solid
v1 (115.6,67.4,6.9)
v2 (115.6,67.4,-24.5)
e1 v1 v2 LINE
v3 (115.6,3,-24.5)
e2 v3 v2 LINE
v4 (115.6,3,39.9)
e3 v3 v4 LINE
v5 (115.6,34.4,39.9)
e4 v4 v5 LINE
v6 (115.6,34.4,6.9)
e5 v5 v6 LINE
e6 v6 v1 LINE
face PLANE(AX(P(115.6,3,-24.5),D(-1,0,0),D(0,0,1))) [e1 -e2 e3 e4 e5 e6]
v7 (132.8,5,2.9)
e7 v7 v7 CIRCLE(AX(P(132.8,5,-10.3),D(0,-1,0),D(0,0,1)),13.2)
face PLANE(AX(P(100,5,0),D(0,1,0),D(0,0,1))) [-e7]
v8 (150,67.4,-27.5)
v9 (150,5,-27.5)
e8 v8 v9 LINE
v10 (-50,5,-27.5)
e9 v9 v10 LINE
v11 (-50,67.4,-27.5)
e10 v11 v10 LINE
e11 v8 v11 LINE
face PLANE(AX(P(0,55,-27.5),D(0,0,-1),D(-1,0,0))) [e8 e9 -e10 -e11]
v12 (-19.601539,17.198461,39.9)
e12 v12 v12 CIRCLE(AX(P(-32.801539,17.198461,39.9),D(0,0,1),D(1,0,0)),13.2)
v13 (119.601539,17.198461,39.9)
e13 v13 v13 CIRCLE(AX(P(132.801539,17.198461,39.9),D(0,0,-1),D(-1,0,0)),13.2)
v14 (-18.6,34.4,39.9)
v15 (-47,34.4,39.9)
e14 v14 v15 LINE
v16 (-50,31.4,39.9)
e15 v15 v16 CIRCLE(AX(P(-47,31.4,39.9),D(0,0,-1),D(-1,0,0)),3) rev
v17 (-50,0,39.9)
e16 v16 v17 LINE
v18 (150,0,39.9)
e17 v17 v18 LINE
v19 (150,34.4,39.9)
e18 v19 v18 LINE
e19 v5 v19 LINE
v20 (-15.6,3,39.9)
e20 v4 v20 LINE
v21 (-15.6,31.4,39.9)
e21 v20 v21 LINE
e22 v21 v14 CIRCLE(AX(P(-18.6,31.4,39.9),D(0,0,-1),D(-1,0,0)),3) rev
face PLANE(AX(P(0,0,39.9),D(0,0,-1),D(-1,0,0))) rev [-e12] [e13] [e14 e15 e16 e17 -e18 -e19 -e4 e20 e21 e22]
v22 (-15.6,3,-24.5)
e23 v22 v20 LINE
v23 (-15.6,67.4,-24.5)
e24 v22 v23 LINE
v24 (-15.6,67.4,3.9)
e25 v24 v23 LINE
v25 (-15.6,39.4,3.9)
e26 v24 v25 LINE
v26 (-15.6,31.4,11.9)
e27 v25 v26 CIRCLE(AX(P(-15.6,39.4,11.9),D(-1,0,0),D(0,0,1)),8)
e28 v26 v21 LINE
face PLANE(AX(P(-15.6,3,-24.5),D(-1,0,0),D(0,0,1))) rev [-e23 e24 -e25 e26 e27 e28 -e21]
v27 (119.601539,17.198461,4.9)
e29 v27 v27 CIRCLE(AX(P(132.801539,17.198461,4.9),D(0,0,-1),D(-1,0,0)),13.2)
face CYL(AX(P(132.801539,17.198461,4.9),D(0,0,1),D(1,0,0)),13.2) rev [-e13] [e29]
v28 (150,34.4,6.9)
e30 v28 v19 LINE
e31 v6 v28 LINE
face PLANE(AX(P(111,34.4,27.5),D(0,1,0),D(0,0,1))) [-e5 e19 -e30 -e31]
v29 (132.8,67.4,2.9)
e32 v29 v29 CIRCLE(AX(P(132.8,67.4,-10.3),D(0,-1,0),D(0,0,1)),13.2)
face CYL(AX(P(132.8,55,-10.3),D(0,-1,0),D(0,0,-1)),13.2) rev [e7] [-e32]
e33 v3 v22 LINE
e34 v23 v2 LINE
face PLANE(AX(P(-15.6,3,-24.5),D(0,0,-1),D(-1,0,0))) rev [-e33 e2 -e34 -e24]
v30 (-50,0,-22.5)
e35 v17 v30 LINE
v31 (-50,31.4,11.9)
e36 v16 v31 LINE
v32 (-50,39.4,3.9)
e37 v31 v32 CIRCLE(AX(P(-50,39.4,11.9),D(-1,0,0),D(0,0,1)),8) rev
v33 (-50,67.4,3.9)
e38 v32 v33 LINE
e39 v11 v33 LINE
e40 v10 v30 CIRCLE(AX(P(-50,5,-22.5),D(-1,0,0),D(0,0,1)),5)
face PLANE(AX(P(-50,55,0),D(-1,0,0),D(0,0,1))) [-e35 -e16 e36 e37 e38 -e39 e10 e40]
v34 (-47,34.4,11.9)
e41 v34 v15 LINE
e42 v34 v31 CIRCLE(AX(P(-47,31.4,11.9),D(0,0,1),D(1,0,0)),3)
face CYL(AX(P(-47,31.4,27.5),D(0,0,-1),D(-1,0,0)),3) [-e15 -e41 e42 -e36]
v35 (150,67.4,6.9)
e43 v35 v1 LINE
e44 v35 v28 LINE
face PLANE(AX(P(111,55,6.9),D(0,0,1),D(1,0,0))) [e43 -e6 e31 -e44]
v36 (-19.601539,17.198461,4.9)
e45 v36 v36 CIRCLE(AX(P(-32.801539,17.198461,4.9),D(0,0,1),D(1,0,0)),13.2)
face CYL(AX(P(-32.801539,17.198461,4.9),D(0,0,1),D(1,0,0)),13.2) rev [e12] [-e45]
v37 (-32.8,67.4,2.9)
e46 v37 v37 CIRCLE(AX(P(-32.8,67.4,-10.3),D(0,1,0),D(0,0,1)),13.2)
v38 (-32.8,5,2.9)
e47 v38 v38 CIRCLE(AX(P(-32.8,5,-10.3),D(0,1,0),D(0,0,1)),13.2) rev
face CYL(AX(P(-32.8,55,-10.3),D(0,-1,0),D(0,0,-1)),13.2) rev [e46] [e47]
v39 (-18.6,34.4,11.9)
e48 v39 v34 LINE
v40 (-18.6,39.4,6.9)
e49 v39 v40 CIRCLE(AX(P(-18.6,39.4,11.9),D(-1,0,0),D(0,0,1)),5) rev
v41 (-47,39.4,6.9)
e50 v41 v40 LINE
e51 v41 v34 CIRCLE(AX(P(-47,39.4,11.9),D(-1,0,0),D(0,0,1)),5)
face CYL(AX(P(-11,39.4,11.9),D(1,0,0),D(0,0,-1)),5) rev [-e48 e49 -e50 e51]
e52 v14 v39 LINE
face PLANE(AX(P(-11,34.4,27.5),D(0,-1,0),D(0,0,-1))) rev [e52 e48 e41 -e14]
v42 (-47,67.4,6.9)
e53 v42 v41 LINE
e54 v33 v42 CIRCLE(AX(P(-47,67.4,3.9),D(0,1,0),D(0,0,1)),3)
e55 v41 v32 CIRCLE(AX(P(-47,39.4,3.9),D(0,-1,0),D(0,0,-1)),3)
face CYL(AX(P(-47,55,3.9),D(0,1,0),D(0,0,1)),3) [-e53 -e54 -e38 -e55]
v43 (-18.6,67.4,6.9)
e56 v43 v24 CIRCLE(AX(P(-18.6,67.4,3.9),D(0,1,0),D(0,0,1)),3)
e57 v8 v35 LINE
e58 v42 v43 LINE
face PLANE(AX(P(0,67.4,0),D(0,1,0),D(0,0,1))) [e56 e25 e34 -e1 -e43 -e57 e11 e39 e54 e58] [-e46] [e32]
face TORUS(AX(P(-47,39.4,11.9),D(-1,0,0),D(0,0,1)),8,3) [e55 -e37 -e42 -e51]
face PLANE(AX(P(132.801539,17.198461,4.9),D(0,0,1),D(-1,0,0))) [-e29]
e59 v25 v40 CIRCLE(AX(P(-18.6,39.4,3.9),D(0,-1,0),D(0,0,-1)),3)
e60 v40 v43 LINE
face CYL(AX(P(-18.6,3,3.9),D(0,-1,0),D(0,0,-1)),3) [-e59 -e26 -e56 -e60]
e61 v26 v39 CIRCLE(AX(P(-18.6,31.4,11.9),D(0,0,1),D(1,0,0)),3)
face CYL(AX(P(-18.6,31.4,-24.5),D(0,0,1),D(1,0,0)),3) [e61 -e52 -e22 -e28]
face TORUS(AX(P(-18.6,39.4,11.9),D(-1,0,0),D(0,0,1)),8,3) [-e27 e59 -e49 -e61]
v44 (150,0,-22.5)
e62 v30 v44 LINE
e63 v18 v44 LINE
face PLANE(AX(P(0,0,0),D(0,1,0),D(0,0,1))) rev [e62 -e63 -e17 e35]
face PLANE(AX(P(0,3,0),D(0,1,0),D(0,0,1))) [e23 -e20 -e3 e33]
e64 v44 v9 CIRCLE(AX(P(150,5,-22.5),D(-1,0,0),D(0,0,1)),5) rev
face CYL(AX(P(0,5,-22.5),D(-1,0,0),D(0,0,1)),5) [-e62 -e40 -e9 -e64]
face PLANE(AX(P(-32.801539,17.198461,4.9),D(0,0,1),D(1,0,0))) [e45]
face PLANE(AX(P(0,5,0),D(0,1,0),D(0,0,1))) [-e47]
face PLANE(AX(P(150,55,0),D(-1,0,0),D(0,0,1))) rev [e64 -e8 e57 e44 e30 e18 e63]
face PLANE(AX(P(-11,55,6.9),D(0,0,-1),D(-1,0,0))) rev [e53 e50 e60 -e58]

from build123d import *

# Parameters (mm, degrees)
SKETCH1_R           = 13.2
BOSS_EXTRUDE3_DEPTH = 5
SKETCH1_6_W         = 100
SKETCH1_6_H         = 55
SKETCH1_6_R         = 13.2
BOSS_EXTRUDE4_DEPTH = 55
SKETCH2_W           = 65.6
SKETCH2_H           = 52
CUT_EXTRUDE1_DEPTH  = 52
SKETCH3_R           = 13.2
CUT_EXTRUDE2_DEPTH  = 22.6
SKETCH4_W           = 20.6
SKETCH4_H           = 20.6
CUT_EXTRUDE4_DEPTH  = 39
SKETCH9_R           = 13.2
BOSS_EXTRUDE5_DEPTH = 12.4
BOSS_EXTRUDE7_START = 12.4
SKETCH10_R          = 13.2
BOSS_EXTRUDE7_DEPTH = 12.4
MIRROR1_START       = 30.398461356
MIRROR1_OUTLINE_R   = 13.2
MIRROR1_DEPTH       = 37.001538644
MIRROR1_2_OUTLINE_W = 100
MIRROR1_2_OUTLINE_H = 67.4
MIRROR1_2_OUTLINE_R = 13.2
MIRROR1_2_DEPTH     = 3
MIRROR1_3_OUTLINE_W = 34.4
MIRROR1_3_OUTLINE_H = 33
MIRROR1_3_DEPTH     = 4.001538644
MIRROR1_START_2     = 3
MIRROR1_4_OUTLINE_R = 13.2
MIRROR1_4_DEPTH     = 0.998461256
MIRROR1_START_3     = 3.998461256
MIRROR1_5_OUTLINE_R = 13.2
MIRROR1_5_DEPTH     = 26.4000001
MIRROR1_START_4     = 4.9
MIRROR1_6_OUTLINE_R = 13.2
MIRROR1_6_DEPTH     = 35
FILLET3_R           = 5
FILLET4_R           = 5
FILLET5_R           = 3
FILLET6_R           = 3


with BuildPart() as part:
    # Sketch1 → Boss-Extrude3 (new body)
    with BuildSketch(Plane(origin=(0, 0, 0), x_dir=(1, 0, 0), z_dir=(0, 1, 0))):
        with Locations(Location((-32.8, 10.3, 0), (0, 0, 270))):
            Circle(SKETCH1_R)
    boss_extrude3 = extrude(amount=BOSS_EXTRUDE3_DEPTH)

    # Sketch1<6> → Boss-Extrude4 (add)
    with BuildSketch(Plane(origin=(0, 0, 0), x_dir=(1, 0, 0), z_dir=(0, 1, 0))):
        Rectangle(SKETCH1_6_W, SKETCH1_6_H)
        with Locations(Location((-32.8, 10.3, 0), (0, 0, 270))):
            Circle(SKETCH1_6_R, mode=Mode.SUBTRACT)
    extrude(amount=BOSS_EXTRUDE4_DEPTH)

    # Sketch2 → Cut-Extrude1 (cut)
    with BuildSketch(Plane(origin=(0, 55, 0), x_dir=(1, 0, 0), z_dir=(0, 1, 0))):
        with Locations((17.2, -1.5)):
            Rectangle(SKETCH2_W, SKETCH2_H)
    extrude(amount=-CUT_EXTRUDE1_DEPTH, mode=Mode.SUBTRACT)

    # Sketch3 → Cut-Extrude2 (cut)
    with BuildSketch(Plane.XY.offset(27.5)):
        with Locations((-32.801538644, 17.198461356)):
            Circle(SKETCH3_R)
    extrude(amount=-CUT_EXTRUDE2_DEPTH, mode=Mode.SUBTRACT)

    # Sketch4 → Cut-Extrude4 (cut)
    with BuildSketch(Plane.ZY.offset(50)):
        with Locations((17.2, 44.7)):
            Rectangle(SKETCH4_W, SKETCH4_H)
    extrude(amount=-CUT_EXTRUDE4_DEPTH, mode=Mode.SUBTRACT)

    # Sketch9 → Boss-Extrude5 (add)
    with BuildSketch(Plane(origin=(0, 55, 0), x_dir=(1, 0, 0), z_dir=(0, 1, 0))):
        Polygon((-50, -6.9), (-15.6, -6.9), (-15.6, 24.5), (50, 24.5), (50, 27.5), (-50, 27.5), align=None)
        with Locations(Location((-32.8, 10.3, 0), (0, 0, 270))):
            Circle(SKETCH9_R, mode=Mode.SUBTRACT)
    extrude(amount=BOSS_EXTRUDE5_DEPTH)

    # Sketch10 → Boss-Extrude7 (add)
    with BuildSketch(Plane.XY.offset(27.5).offset(BOSS_EXTRUDE7_START)):
        Polygon((-15.6, 3), (-15.6, 34.4), (-50, 34.4), (-50, 0), (50, 0), (50, 3), align=None)
        with Locations((-32.801538644, 17.198461356)):
            Circle(SKETCH10_R, mode=Mode.SUBTRACT)
    extrude(amount=-BOSS_EXTRUDE7_DEPTH)

    # Mirror1: read off the stored shape, not the designer's step
    # Mirror1 outline → Mirror1 (add)
    with BuildSketch(Plane(origin=(0, 0, 0), x_dir=(1, 0, 0), z_dir=(0, 1, 0)).offset(MIRROR1_START)):
        Polygon((150, -6.9), (150, 27.5), (50, 27.5), (50, 24.5), (115.6, 24.5), (115.6, -6.9), align=None)
        with Locations((132.8, 10.3)):
            Circle(MIRROR1_OUTLINE_R, mode=Mode.SUBTRACT)
    extrude(amount=MIRROR1_DEPTH)

    # Mirror1 2 outline → Mirror1 2 (add)
    with BuildSketch(Plane(origin=(0, 0, 0), x_dir=(1, 0, 0), z_dir=(0, 1, 0))):
        with Locations((100, -6.2)):
            Rectangle(MIRROR1_2_OUTLINE_W, MIRROR1_2_OUTLINE_H)
        with Locations((132.8, 10.3)):
            Circle(MIRROR1_2_OUTLINE_R, mode=Mode.SUBTRACT)
    extrude(amount=MIRROR1_2_DEPTH)

    # Mirror1 3 outline → Mirror1 3 (add)
    with BuildSketch(Plane(origin=(0, 0, 0), x_dir=(1, 0, 0), z_dir=(0, 1, 0)).offset(MIRROR1_START)):
        with Locations((132.8, -23.4)):
            Rectangle(MIRROR1_3_OUTLINE_W, MIRROR1_3_OUTLINE_H)
    extrude(amount=MIRROR1_3_DEPTH)

    # Mirror1 4 outline → Mirror1 4 (add)
    with BuildSketch(Plane(origin=(0, 0, 0), x_dir=(1, 0, 0), z_dir=(0, 1, 0)).offset(MIRROR1_START_2)):
        Polygon((150, 27.5), (50, 27.5), (50, 24.5), (115.6, 24.5), (115.6, -39.9), (150, -39.9), align=None)
        with Locations((132.8, 10.3)):
            Circle(MIRROR1_4_OUTLINE_R, mode=Mode.SUBTRACT)
    extrude(amount=MIRROR1_4_DEPTH)

    # Mirror1 5 outline → Mirror1 5 (add)
    with BuildSketch(Plane(origin=(0, 0, 0), x_dir=(1, 0, 0), z_dir=(0, 1, 0)).offset(MIRROR1_START_3)):
        Polygon((150, -39.9), (150, 27.5), (50, 27.5), (50, 24.5), (115.6, 24.5), (115.6, -39.9), align=None)
        with Locations((132.8, 10.3)):
            Circle(MIRROR1_5_OUTLINE_R, mode=Mode.SUBTRACT)
    extrude(amount=MIRROR1_5_DEPTH)

    # Mirror1 6 outline → Mirror1 6 (cut)
    with BuildSketch(Plane.XY.offset(MIRROR1_START_4)):
        with Locations((132.801538644, 17.198461356)):
            Circle(MIRROR1_6_OUTLINE_R)
    extrude(amount=MIRROR1_6_DEPTH, mode=Mode.SUBTRACT)

    # Mirror2: Boss-Extrude3 across plane
    add(boss_extrude3.mirror(Plane.ZY.offset(-50)))

    # Fillet3
    fillet3_edges = [part.edges().sort_by_distance(p)[0] for p in [
        (50, 0, -27.5),
    ]]
    fillet(fillet3_edges, radius=FILLET3_R)

    # Fillet4
    fillet4_edges = [part.edges().sort_by_distance(p)[0] for p in [
        (-32.8, 34.4, 6.9),
    ]]
    fillet(fillet4_edges, radius=FILLET4_R)

    # Fillet5
    fillet5_edges = [part.edges().sort_by_distance(p)[0] for p in [
        (-50, 34.4, 25.9),
        (-50, 35.864466094, 8.364466094),
        (-50, 53.4, 6.9),
    ]]
    fillet(fillet5_edges, radius=FILLET5_R)

    # Fillet6
    fillet6_edges = [part.edges().sort_by_distance(p)[0] for p in [
        (-15.6, 34.4, 25.9),
        (-15.6, 35.864466094, 8.364466094),
        (-15.6, 53.4, 6.9),
    ]]
    fillet(fillet6_edges, radius=FILLET6_R)


solid = part.part
